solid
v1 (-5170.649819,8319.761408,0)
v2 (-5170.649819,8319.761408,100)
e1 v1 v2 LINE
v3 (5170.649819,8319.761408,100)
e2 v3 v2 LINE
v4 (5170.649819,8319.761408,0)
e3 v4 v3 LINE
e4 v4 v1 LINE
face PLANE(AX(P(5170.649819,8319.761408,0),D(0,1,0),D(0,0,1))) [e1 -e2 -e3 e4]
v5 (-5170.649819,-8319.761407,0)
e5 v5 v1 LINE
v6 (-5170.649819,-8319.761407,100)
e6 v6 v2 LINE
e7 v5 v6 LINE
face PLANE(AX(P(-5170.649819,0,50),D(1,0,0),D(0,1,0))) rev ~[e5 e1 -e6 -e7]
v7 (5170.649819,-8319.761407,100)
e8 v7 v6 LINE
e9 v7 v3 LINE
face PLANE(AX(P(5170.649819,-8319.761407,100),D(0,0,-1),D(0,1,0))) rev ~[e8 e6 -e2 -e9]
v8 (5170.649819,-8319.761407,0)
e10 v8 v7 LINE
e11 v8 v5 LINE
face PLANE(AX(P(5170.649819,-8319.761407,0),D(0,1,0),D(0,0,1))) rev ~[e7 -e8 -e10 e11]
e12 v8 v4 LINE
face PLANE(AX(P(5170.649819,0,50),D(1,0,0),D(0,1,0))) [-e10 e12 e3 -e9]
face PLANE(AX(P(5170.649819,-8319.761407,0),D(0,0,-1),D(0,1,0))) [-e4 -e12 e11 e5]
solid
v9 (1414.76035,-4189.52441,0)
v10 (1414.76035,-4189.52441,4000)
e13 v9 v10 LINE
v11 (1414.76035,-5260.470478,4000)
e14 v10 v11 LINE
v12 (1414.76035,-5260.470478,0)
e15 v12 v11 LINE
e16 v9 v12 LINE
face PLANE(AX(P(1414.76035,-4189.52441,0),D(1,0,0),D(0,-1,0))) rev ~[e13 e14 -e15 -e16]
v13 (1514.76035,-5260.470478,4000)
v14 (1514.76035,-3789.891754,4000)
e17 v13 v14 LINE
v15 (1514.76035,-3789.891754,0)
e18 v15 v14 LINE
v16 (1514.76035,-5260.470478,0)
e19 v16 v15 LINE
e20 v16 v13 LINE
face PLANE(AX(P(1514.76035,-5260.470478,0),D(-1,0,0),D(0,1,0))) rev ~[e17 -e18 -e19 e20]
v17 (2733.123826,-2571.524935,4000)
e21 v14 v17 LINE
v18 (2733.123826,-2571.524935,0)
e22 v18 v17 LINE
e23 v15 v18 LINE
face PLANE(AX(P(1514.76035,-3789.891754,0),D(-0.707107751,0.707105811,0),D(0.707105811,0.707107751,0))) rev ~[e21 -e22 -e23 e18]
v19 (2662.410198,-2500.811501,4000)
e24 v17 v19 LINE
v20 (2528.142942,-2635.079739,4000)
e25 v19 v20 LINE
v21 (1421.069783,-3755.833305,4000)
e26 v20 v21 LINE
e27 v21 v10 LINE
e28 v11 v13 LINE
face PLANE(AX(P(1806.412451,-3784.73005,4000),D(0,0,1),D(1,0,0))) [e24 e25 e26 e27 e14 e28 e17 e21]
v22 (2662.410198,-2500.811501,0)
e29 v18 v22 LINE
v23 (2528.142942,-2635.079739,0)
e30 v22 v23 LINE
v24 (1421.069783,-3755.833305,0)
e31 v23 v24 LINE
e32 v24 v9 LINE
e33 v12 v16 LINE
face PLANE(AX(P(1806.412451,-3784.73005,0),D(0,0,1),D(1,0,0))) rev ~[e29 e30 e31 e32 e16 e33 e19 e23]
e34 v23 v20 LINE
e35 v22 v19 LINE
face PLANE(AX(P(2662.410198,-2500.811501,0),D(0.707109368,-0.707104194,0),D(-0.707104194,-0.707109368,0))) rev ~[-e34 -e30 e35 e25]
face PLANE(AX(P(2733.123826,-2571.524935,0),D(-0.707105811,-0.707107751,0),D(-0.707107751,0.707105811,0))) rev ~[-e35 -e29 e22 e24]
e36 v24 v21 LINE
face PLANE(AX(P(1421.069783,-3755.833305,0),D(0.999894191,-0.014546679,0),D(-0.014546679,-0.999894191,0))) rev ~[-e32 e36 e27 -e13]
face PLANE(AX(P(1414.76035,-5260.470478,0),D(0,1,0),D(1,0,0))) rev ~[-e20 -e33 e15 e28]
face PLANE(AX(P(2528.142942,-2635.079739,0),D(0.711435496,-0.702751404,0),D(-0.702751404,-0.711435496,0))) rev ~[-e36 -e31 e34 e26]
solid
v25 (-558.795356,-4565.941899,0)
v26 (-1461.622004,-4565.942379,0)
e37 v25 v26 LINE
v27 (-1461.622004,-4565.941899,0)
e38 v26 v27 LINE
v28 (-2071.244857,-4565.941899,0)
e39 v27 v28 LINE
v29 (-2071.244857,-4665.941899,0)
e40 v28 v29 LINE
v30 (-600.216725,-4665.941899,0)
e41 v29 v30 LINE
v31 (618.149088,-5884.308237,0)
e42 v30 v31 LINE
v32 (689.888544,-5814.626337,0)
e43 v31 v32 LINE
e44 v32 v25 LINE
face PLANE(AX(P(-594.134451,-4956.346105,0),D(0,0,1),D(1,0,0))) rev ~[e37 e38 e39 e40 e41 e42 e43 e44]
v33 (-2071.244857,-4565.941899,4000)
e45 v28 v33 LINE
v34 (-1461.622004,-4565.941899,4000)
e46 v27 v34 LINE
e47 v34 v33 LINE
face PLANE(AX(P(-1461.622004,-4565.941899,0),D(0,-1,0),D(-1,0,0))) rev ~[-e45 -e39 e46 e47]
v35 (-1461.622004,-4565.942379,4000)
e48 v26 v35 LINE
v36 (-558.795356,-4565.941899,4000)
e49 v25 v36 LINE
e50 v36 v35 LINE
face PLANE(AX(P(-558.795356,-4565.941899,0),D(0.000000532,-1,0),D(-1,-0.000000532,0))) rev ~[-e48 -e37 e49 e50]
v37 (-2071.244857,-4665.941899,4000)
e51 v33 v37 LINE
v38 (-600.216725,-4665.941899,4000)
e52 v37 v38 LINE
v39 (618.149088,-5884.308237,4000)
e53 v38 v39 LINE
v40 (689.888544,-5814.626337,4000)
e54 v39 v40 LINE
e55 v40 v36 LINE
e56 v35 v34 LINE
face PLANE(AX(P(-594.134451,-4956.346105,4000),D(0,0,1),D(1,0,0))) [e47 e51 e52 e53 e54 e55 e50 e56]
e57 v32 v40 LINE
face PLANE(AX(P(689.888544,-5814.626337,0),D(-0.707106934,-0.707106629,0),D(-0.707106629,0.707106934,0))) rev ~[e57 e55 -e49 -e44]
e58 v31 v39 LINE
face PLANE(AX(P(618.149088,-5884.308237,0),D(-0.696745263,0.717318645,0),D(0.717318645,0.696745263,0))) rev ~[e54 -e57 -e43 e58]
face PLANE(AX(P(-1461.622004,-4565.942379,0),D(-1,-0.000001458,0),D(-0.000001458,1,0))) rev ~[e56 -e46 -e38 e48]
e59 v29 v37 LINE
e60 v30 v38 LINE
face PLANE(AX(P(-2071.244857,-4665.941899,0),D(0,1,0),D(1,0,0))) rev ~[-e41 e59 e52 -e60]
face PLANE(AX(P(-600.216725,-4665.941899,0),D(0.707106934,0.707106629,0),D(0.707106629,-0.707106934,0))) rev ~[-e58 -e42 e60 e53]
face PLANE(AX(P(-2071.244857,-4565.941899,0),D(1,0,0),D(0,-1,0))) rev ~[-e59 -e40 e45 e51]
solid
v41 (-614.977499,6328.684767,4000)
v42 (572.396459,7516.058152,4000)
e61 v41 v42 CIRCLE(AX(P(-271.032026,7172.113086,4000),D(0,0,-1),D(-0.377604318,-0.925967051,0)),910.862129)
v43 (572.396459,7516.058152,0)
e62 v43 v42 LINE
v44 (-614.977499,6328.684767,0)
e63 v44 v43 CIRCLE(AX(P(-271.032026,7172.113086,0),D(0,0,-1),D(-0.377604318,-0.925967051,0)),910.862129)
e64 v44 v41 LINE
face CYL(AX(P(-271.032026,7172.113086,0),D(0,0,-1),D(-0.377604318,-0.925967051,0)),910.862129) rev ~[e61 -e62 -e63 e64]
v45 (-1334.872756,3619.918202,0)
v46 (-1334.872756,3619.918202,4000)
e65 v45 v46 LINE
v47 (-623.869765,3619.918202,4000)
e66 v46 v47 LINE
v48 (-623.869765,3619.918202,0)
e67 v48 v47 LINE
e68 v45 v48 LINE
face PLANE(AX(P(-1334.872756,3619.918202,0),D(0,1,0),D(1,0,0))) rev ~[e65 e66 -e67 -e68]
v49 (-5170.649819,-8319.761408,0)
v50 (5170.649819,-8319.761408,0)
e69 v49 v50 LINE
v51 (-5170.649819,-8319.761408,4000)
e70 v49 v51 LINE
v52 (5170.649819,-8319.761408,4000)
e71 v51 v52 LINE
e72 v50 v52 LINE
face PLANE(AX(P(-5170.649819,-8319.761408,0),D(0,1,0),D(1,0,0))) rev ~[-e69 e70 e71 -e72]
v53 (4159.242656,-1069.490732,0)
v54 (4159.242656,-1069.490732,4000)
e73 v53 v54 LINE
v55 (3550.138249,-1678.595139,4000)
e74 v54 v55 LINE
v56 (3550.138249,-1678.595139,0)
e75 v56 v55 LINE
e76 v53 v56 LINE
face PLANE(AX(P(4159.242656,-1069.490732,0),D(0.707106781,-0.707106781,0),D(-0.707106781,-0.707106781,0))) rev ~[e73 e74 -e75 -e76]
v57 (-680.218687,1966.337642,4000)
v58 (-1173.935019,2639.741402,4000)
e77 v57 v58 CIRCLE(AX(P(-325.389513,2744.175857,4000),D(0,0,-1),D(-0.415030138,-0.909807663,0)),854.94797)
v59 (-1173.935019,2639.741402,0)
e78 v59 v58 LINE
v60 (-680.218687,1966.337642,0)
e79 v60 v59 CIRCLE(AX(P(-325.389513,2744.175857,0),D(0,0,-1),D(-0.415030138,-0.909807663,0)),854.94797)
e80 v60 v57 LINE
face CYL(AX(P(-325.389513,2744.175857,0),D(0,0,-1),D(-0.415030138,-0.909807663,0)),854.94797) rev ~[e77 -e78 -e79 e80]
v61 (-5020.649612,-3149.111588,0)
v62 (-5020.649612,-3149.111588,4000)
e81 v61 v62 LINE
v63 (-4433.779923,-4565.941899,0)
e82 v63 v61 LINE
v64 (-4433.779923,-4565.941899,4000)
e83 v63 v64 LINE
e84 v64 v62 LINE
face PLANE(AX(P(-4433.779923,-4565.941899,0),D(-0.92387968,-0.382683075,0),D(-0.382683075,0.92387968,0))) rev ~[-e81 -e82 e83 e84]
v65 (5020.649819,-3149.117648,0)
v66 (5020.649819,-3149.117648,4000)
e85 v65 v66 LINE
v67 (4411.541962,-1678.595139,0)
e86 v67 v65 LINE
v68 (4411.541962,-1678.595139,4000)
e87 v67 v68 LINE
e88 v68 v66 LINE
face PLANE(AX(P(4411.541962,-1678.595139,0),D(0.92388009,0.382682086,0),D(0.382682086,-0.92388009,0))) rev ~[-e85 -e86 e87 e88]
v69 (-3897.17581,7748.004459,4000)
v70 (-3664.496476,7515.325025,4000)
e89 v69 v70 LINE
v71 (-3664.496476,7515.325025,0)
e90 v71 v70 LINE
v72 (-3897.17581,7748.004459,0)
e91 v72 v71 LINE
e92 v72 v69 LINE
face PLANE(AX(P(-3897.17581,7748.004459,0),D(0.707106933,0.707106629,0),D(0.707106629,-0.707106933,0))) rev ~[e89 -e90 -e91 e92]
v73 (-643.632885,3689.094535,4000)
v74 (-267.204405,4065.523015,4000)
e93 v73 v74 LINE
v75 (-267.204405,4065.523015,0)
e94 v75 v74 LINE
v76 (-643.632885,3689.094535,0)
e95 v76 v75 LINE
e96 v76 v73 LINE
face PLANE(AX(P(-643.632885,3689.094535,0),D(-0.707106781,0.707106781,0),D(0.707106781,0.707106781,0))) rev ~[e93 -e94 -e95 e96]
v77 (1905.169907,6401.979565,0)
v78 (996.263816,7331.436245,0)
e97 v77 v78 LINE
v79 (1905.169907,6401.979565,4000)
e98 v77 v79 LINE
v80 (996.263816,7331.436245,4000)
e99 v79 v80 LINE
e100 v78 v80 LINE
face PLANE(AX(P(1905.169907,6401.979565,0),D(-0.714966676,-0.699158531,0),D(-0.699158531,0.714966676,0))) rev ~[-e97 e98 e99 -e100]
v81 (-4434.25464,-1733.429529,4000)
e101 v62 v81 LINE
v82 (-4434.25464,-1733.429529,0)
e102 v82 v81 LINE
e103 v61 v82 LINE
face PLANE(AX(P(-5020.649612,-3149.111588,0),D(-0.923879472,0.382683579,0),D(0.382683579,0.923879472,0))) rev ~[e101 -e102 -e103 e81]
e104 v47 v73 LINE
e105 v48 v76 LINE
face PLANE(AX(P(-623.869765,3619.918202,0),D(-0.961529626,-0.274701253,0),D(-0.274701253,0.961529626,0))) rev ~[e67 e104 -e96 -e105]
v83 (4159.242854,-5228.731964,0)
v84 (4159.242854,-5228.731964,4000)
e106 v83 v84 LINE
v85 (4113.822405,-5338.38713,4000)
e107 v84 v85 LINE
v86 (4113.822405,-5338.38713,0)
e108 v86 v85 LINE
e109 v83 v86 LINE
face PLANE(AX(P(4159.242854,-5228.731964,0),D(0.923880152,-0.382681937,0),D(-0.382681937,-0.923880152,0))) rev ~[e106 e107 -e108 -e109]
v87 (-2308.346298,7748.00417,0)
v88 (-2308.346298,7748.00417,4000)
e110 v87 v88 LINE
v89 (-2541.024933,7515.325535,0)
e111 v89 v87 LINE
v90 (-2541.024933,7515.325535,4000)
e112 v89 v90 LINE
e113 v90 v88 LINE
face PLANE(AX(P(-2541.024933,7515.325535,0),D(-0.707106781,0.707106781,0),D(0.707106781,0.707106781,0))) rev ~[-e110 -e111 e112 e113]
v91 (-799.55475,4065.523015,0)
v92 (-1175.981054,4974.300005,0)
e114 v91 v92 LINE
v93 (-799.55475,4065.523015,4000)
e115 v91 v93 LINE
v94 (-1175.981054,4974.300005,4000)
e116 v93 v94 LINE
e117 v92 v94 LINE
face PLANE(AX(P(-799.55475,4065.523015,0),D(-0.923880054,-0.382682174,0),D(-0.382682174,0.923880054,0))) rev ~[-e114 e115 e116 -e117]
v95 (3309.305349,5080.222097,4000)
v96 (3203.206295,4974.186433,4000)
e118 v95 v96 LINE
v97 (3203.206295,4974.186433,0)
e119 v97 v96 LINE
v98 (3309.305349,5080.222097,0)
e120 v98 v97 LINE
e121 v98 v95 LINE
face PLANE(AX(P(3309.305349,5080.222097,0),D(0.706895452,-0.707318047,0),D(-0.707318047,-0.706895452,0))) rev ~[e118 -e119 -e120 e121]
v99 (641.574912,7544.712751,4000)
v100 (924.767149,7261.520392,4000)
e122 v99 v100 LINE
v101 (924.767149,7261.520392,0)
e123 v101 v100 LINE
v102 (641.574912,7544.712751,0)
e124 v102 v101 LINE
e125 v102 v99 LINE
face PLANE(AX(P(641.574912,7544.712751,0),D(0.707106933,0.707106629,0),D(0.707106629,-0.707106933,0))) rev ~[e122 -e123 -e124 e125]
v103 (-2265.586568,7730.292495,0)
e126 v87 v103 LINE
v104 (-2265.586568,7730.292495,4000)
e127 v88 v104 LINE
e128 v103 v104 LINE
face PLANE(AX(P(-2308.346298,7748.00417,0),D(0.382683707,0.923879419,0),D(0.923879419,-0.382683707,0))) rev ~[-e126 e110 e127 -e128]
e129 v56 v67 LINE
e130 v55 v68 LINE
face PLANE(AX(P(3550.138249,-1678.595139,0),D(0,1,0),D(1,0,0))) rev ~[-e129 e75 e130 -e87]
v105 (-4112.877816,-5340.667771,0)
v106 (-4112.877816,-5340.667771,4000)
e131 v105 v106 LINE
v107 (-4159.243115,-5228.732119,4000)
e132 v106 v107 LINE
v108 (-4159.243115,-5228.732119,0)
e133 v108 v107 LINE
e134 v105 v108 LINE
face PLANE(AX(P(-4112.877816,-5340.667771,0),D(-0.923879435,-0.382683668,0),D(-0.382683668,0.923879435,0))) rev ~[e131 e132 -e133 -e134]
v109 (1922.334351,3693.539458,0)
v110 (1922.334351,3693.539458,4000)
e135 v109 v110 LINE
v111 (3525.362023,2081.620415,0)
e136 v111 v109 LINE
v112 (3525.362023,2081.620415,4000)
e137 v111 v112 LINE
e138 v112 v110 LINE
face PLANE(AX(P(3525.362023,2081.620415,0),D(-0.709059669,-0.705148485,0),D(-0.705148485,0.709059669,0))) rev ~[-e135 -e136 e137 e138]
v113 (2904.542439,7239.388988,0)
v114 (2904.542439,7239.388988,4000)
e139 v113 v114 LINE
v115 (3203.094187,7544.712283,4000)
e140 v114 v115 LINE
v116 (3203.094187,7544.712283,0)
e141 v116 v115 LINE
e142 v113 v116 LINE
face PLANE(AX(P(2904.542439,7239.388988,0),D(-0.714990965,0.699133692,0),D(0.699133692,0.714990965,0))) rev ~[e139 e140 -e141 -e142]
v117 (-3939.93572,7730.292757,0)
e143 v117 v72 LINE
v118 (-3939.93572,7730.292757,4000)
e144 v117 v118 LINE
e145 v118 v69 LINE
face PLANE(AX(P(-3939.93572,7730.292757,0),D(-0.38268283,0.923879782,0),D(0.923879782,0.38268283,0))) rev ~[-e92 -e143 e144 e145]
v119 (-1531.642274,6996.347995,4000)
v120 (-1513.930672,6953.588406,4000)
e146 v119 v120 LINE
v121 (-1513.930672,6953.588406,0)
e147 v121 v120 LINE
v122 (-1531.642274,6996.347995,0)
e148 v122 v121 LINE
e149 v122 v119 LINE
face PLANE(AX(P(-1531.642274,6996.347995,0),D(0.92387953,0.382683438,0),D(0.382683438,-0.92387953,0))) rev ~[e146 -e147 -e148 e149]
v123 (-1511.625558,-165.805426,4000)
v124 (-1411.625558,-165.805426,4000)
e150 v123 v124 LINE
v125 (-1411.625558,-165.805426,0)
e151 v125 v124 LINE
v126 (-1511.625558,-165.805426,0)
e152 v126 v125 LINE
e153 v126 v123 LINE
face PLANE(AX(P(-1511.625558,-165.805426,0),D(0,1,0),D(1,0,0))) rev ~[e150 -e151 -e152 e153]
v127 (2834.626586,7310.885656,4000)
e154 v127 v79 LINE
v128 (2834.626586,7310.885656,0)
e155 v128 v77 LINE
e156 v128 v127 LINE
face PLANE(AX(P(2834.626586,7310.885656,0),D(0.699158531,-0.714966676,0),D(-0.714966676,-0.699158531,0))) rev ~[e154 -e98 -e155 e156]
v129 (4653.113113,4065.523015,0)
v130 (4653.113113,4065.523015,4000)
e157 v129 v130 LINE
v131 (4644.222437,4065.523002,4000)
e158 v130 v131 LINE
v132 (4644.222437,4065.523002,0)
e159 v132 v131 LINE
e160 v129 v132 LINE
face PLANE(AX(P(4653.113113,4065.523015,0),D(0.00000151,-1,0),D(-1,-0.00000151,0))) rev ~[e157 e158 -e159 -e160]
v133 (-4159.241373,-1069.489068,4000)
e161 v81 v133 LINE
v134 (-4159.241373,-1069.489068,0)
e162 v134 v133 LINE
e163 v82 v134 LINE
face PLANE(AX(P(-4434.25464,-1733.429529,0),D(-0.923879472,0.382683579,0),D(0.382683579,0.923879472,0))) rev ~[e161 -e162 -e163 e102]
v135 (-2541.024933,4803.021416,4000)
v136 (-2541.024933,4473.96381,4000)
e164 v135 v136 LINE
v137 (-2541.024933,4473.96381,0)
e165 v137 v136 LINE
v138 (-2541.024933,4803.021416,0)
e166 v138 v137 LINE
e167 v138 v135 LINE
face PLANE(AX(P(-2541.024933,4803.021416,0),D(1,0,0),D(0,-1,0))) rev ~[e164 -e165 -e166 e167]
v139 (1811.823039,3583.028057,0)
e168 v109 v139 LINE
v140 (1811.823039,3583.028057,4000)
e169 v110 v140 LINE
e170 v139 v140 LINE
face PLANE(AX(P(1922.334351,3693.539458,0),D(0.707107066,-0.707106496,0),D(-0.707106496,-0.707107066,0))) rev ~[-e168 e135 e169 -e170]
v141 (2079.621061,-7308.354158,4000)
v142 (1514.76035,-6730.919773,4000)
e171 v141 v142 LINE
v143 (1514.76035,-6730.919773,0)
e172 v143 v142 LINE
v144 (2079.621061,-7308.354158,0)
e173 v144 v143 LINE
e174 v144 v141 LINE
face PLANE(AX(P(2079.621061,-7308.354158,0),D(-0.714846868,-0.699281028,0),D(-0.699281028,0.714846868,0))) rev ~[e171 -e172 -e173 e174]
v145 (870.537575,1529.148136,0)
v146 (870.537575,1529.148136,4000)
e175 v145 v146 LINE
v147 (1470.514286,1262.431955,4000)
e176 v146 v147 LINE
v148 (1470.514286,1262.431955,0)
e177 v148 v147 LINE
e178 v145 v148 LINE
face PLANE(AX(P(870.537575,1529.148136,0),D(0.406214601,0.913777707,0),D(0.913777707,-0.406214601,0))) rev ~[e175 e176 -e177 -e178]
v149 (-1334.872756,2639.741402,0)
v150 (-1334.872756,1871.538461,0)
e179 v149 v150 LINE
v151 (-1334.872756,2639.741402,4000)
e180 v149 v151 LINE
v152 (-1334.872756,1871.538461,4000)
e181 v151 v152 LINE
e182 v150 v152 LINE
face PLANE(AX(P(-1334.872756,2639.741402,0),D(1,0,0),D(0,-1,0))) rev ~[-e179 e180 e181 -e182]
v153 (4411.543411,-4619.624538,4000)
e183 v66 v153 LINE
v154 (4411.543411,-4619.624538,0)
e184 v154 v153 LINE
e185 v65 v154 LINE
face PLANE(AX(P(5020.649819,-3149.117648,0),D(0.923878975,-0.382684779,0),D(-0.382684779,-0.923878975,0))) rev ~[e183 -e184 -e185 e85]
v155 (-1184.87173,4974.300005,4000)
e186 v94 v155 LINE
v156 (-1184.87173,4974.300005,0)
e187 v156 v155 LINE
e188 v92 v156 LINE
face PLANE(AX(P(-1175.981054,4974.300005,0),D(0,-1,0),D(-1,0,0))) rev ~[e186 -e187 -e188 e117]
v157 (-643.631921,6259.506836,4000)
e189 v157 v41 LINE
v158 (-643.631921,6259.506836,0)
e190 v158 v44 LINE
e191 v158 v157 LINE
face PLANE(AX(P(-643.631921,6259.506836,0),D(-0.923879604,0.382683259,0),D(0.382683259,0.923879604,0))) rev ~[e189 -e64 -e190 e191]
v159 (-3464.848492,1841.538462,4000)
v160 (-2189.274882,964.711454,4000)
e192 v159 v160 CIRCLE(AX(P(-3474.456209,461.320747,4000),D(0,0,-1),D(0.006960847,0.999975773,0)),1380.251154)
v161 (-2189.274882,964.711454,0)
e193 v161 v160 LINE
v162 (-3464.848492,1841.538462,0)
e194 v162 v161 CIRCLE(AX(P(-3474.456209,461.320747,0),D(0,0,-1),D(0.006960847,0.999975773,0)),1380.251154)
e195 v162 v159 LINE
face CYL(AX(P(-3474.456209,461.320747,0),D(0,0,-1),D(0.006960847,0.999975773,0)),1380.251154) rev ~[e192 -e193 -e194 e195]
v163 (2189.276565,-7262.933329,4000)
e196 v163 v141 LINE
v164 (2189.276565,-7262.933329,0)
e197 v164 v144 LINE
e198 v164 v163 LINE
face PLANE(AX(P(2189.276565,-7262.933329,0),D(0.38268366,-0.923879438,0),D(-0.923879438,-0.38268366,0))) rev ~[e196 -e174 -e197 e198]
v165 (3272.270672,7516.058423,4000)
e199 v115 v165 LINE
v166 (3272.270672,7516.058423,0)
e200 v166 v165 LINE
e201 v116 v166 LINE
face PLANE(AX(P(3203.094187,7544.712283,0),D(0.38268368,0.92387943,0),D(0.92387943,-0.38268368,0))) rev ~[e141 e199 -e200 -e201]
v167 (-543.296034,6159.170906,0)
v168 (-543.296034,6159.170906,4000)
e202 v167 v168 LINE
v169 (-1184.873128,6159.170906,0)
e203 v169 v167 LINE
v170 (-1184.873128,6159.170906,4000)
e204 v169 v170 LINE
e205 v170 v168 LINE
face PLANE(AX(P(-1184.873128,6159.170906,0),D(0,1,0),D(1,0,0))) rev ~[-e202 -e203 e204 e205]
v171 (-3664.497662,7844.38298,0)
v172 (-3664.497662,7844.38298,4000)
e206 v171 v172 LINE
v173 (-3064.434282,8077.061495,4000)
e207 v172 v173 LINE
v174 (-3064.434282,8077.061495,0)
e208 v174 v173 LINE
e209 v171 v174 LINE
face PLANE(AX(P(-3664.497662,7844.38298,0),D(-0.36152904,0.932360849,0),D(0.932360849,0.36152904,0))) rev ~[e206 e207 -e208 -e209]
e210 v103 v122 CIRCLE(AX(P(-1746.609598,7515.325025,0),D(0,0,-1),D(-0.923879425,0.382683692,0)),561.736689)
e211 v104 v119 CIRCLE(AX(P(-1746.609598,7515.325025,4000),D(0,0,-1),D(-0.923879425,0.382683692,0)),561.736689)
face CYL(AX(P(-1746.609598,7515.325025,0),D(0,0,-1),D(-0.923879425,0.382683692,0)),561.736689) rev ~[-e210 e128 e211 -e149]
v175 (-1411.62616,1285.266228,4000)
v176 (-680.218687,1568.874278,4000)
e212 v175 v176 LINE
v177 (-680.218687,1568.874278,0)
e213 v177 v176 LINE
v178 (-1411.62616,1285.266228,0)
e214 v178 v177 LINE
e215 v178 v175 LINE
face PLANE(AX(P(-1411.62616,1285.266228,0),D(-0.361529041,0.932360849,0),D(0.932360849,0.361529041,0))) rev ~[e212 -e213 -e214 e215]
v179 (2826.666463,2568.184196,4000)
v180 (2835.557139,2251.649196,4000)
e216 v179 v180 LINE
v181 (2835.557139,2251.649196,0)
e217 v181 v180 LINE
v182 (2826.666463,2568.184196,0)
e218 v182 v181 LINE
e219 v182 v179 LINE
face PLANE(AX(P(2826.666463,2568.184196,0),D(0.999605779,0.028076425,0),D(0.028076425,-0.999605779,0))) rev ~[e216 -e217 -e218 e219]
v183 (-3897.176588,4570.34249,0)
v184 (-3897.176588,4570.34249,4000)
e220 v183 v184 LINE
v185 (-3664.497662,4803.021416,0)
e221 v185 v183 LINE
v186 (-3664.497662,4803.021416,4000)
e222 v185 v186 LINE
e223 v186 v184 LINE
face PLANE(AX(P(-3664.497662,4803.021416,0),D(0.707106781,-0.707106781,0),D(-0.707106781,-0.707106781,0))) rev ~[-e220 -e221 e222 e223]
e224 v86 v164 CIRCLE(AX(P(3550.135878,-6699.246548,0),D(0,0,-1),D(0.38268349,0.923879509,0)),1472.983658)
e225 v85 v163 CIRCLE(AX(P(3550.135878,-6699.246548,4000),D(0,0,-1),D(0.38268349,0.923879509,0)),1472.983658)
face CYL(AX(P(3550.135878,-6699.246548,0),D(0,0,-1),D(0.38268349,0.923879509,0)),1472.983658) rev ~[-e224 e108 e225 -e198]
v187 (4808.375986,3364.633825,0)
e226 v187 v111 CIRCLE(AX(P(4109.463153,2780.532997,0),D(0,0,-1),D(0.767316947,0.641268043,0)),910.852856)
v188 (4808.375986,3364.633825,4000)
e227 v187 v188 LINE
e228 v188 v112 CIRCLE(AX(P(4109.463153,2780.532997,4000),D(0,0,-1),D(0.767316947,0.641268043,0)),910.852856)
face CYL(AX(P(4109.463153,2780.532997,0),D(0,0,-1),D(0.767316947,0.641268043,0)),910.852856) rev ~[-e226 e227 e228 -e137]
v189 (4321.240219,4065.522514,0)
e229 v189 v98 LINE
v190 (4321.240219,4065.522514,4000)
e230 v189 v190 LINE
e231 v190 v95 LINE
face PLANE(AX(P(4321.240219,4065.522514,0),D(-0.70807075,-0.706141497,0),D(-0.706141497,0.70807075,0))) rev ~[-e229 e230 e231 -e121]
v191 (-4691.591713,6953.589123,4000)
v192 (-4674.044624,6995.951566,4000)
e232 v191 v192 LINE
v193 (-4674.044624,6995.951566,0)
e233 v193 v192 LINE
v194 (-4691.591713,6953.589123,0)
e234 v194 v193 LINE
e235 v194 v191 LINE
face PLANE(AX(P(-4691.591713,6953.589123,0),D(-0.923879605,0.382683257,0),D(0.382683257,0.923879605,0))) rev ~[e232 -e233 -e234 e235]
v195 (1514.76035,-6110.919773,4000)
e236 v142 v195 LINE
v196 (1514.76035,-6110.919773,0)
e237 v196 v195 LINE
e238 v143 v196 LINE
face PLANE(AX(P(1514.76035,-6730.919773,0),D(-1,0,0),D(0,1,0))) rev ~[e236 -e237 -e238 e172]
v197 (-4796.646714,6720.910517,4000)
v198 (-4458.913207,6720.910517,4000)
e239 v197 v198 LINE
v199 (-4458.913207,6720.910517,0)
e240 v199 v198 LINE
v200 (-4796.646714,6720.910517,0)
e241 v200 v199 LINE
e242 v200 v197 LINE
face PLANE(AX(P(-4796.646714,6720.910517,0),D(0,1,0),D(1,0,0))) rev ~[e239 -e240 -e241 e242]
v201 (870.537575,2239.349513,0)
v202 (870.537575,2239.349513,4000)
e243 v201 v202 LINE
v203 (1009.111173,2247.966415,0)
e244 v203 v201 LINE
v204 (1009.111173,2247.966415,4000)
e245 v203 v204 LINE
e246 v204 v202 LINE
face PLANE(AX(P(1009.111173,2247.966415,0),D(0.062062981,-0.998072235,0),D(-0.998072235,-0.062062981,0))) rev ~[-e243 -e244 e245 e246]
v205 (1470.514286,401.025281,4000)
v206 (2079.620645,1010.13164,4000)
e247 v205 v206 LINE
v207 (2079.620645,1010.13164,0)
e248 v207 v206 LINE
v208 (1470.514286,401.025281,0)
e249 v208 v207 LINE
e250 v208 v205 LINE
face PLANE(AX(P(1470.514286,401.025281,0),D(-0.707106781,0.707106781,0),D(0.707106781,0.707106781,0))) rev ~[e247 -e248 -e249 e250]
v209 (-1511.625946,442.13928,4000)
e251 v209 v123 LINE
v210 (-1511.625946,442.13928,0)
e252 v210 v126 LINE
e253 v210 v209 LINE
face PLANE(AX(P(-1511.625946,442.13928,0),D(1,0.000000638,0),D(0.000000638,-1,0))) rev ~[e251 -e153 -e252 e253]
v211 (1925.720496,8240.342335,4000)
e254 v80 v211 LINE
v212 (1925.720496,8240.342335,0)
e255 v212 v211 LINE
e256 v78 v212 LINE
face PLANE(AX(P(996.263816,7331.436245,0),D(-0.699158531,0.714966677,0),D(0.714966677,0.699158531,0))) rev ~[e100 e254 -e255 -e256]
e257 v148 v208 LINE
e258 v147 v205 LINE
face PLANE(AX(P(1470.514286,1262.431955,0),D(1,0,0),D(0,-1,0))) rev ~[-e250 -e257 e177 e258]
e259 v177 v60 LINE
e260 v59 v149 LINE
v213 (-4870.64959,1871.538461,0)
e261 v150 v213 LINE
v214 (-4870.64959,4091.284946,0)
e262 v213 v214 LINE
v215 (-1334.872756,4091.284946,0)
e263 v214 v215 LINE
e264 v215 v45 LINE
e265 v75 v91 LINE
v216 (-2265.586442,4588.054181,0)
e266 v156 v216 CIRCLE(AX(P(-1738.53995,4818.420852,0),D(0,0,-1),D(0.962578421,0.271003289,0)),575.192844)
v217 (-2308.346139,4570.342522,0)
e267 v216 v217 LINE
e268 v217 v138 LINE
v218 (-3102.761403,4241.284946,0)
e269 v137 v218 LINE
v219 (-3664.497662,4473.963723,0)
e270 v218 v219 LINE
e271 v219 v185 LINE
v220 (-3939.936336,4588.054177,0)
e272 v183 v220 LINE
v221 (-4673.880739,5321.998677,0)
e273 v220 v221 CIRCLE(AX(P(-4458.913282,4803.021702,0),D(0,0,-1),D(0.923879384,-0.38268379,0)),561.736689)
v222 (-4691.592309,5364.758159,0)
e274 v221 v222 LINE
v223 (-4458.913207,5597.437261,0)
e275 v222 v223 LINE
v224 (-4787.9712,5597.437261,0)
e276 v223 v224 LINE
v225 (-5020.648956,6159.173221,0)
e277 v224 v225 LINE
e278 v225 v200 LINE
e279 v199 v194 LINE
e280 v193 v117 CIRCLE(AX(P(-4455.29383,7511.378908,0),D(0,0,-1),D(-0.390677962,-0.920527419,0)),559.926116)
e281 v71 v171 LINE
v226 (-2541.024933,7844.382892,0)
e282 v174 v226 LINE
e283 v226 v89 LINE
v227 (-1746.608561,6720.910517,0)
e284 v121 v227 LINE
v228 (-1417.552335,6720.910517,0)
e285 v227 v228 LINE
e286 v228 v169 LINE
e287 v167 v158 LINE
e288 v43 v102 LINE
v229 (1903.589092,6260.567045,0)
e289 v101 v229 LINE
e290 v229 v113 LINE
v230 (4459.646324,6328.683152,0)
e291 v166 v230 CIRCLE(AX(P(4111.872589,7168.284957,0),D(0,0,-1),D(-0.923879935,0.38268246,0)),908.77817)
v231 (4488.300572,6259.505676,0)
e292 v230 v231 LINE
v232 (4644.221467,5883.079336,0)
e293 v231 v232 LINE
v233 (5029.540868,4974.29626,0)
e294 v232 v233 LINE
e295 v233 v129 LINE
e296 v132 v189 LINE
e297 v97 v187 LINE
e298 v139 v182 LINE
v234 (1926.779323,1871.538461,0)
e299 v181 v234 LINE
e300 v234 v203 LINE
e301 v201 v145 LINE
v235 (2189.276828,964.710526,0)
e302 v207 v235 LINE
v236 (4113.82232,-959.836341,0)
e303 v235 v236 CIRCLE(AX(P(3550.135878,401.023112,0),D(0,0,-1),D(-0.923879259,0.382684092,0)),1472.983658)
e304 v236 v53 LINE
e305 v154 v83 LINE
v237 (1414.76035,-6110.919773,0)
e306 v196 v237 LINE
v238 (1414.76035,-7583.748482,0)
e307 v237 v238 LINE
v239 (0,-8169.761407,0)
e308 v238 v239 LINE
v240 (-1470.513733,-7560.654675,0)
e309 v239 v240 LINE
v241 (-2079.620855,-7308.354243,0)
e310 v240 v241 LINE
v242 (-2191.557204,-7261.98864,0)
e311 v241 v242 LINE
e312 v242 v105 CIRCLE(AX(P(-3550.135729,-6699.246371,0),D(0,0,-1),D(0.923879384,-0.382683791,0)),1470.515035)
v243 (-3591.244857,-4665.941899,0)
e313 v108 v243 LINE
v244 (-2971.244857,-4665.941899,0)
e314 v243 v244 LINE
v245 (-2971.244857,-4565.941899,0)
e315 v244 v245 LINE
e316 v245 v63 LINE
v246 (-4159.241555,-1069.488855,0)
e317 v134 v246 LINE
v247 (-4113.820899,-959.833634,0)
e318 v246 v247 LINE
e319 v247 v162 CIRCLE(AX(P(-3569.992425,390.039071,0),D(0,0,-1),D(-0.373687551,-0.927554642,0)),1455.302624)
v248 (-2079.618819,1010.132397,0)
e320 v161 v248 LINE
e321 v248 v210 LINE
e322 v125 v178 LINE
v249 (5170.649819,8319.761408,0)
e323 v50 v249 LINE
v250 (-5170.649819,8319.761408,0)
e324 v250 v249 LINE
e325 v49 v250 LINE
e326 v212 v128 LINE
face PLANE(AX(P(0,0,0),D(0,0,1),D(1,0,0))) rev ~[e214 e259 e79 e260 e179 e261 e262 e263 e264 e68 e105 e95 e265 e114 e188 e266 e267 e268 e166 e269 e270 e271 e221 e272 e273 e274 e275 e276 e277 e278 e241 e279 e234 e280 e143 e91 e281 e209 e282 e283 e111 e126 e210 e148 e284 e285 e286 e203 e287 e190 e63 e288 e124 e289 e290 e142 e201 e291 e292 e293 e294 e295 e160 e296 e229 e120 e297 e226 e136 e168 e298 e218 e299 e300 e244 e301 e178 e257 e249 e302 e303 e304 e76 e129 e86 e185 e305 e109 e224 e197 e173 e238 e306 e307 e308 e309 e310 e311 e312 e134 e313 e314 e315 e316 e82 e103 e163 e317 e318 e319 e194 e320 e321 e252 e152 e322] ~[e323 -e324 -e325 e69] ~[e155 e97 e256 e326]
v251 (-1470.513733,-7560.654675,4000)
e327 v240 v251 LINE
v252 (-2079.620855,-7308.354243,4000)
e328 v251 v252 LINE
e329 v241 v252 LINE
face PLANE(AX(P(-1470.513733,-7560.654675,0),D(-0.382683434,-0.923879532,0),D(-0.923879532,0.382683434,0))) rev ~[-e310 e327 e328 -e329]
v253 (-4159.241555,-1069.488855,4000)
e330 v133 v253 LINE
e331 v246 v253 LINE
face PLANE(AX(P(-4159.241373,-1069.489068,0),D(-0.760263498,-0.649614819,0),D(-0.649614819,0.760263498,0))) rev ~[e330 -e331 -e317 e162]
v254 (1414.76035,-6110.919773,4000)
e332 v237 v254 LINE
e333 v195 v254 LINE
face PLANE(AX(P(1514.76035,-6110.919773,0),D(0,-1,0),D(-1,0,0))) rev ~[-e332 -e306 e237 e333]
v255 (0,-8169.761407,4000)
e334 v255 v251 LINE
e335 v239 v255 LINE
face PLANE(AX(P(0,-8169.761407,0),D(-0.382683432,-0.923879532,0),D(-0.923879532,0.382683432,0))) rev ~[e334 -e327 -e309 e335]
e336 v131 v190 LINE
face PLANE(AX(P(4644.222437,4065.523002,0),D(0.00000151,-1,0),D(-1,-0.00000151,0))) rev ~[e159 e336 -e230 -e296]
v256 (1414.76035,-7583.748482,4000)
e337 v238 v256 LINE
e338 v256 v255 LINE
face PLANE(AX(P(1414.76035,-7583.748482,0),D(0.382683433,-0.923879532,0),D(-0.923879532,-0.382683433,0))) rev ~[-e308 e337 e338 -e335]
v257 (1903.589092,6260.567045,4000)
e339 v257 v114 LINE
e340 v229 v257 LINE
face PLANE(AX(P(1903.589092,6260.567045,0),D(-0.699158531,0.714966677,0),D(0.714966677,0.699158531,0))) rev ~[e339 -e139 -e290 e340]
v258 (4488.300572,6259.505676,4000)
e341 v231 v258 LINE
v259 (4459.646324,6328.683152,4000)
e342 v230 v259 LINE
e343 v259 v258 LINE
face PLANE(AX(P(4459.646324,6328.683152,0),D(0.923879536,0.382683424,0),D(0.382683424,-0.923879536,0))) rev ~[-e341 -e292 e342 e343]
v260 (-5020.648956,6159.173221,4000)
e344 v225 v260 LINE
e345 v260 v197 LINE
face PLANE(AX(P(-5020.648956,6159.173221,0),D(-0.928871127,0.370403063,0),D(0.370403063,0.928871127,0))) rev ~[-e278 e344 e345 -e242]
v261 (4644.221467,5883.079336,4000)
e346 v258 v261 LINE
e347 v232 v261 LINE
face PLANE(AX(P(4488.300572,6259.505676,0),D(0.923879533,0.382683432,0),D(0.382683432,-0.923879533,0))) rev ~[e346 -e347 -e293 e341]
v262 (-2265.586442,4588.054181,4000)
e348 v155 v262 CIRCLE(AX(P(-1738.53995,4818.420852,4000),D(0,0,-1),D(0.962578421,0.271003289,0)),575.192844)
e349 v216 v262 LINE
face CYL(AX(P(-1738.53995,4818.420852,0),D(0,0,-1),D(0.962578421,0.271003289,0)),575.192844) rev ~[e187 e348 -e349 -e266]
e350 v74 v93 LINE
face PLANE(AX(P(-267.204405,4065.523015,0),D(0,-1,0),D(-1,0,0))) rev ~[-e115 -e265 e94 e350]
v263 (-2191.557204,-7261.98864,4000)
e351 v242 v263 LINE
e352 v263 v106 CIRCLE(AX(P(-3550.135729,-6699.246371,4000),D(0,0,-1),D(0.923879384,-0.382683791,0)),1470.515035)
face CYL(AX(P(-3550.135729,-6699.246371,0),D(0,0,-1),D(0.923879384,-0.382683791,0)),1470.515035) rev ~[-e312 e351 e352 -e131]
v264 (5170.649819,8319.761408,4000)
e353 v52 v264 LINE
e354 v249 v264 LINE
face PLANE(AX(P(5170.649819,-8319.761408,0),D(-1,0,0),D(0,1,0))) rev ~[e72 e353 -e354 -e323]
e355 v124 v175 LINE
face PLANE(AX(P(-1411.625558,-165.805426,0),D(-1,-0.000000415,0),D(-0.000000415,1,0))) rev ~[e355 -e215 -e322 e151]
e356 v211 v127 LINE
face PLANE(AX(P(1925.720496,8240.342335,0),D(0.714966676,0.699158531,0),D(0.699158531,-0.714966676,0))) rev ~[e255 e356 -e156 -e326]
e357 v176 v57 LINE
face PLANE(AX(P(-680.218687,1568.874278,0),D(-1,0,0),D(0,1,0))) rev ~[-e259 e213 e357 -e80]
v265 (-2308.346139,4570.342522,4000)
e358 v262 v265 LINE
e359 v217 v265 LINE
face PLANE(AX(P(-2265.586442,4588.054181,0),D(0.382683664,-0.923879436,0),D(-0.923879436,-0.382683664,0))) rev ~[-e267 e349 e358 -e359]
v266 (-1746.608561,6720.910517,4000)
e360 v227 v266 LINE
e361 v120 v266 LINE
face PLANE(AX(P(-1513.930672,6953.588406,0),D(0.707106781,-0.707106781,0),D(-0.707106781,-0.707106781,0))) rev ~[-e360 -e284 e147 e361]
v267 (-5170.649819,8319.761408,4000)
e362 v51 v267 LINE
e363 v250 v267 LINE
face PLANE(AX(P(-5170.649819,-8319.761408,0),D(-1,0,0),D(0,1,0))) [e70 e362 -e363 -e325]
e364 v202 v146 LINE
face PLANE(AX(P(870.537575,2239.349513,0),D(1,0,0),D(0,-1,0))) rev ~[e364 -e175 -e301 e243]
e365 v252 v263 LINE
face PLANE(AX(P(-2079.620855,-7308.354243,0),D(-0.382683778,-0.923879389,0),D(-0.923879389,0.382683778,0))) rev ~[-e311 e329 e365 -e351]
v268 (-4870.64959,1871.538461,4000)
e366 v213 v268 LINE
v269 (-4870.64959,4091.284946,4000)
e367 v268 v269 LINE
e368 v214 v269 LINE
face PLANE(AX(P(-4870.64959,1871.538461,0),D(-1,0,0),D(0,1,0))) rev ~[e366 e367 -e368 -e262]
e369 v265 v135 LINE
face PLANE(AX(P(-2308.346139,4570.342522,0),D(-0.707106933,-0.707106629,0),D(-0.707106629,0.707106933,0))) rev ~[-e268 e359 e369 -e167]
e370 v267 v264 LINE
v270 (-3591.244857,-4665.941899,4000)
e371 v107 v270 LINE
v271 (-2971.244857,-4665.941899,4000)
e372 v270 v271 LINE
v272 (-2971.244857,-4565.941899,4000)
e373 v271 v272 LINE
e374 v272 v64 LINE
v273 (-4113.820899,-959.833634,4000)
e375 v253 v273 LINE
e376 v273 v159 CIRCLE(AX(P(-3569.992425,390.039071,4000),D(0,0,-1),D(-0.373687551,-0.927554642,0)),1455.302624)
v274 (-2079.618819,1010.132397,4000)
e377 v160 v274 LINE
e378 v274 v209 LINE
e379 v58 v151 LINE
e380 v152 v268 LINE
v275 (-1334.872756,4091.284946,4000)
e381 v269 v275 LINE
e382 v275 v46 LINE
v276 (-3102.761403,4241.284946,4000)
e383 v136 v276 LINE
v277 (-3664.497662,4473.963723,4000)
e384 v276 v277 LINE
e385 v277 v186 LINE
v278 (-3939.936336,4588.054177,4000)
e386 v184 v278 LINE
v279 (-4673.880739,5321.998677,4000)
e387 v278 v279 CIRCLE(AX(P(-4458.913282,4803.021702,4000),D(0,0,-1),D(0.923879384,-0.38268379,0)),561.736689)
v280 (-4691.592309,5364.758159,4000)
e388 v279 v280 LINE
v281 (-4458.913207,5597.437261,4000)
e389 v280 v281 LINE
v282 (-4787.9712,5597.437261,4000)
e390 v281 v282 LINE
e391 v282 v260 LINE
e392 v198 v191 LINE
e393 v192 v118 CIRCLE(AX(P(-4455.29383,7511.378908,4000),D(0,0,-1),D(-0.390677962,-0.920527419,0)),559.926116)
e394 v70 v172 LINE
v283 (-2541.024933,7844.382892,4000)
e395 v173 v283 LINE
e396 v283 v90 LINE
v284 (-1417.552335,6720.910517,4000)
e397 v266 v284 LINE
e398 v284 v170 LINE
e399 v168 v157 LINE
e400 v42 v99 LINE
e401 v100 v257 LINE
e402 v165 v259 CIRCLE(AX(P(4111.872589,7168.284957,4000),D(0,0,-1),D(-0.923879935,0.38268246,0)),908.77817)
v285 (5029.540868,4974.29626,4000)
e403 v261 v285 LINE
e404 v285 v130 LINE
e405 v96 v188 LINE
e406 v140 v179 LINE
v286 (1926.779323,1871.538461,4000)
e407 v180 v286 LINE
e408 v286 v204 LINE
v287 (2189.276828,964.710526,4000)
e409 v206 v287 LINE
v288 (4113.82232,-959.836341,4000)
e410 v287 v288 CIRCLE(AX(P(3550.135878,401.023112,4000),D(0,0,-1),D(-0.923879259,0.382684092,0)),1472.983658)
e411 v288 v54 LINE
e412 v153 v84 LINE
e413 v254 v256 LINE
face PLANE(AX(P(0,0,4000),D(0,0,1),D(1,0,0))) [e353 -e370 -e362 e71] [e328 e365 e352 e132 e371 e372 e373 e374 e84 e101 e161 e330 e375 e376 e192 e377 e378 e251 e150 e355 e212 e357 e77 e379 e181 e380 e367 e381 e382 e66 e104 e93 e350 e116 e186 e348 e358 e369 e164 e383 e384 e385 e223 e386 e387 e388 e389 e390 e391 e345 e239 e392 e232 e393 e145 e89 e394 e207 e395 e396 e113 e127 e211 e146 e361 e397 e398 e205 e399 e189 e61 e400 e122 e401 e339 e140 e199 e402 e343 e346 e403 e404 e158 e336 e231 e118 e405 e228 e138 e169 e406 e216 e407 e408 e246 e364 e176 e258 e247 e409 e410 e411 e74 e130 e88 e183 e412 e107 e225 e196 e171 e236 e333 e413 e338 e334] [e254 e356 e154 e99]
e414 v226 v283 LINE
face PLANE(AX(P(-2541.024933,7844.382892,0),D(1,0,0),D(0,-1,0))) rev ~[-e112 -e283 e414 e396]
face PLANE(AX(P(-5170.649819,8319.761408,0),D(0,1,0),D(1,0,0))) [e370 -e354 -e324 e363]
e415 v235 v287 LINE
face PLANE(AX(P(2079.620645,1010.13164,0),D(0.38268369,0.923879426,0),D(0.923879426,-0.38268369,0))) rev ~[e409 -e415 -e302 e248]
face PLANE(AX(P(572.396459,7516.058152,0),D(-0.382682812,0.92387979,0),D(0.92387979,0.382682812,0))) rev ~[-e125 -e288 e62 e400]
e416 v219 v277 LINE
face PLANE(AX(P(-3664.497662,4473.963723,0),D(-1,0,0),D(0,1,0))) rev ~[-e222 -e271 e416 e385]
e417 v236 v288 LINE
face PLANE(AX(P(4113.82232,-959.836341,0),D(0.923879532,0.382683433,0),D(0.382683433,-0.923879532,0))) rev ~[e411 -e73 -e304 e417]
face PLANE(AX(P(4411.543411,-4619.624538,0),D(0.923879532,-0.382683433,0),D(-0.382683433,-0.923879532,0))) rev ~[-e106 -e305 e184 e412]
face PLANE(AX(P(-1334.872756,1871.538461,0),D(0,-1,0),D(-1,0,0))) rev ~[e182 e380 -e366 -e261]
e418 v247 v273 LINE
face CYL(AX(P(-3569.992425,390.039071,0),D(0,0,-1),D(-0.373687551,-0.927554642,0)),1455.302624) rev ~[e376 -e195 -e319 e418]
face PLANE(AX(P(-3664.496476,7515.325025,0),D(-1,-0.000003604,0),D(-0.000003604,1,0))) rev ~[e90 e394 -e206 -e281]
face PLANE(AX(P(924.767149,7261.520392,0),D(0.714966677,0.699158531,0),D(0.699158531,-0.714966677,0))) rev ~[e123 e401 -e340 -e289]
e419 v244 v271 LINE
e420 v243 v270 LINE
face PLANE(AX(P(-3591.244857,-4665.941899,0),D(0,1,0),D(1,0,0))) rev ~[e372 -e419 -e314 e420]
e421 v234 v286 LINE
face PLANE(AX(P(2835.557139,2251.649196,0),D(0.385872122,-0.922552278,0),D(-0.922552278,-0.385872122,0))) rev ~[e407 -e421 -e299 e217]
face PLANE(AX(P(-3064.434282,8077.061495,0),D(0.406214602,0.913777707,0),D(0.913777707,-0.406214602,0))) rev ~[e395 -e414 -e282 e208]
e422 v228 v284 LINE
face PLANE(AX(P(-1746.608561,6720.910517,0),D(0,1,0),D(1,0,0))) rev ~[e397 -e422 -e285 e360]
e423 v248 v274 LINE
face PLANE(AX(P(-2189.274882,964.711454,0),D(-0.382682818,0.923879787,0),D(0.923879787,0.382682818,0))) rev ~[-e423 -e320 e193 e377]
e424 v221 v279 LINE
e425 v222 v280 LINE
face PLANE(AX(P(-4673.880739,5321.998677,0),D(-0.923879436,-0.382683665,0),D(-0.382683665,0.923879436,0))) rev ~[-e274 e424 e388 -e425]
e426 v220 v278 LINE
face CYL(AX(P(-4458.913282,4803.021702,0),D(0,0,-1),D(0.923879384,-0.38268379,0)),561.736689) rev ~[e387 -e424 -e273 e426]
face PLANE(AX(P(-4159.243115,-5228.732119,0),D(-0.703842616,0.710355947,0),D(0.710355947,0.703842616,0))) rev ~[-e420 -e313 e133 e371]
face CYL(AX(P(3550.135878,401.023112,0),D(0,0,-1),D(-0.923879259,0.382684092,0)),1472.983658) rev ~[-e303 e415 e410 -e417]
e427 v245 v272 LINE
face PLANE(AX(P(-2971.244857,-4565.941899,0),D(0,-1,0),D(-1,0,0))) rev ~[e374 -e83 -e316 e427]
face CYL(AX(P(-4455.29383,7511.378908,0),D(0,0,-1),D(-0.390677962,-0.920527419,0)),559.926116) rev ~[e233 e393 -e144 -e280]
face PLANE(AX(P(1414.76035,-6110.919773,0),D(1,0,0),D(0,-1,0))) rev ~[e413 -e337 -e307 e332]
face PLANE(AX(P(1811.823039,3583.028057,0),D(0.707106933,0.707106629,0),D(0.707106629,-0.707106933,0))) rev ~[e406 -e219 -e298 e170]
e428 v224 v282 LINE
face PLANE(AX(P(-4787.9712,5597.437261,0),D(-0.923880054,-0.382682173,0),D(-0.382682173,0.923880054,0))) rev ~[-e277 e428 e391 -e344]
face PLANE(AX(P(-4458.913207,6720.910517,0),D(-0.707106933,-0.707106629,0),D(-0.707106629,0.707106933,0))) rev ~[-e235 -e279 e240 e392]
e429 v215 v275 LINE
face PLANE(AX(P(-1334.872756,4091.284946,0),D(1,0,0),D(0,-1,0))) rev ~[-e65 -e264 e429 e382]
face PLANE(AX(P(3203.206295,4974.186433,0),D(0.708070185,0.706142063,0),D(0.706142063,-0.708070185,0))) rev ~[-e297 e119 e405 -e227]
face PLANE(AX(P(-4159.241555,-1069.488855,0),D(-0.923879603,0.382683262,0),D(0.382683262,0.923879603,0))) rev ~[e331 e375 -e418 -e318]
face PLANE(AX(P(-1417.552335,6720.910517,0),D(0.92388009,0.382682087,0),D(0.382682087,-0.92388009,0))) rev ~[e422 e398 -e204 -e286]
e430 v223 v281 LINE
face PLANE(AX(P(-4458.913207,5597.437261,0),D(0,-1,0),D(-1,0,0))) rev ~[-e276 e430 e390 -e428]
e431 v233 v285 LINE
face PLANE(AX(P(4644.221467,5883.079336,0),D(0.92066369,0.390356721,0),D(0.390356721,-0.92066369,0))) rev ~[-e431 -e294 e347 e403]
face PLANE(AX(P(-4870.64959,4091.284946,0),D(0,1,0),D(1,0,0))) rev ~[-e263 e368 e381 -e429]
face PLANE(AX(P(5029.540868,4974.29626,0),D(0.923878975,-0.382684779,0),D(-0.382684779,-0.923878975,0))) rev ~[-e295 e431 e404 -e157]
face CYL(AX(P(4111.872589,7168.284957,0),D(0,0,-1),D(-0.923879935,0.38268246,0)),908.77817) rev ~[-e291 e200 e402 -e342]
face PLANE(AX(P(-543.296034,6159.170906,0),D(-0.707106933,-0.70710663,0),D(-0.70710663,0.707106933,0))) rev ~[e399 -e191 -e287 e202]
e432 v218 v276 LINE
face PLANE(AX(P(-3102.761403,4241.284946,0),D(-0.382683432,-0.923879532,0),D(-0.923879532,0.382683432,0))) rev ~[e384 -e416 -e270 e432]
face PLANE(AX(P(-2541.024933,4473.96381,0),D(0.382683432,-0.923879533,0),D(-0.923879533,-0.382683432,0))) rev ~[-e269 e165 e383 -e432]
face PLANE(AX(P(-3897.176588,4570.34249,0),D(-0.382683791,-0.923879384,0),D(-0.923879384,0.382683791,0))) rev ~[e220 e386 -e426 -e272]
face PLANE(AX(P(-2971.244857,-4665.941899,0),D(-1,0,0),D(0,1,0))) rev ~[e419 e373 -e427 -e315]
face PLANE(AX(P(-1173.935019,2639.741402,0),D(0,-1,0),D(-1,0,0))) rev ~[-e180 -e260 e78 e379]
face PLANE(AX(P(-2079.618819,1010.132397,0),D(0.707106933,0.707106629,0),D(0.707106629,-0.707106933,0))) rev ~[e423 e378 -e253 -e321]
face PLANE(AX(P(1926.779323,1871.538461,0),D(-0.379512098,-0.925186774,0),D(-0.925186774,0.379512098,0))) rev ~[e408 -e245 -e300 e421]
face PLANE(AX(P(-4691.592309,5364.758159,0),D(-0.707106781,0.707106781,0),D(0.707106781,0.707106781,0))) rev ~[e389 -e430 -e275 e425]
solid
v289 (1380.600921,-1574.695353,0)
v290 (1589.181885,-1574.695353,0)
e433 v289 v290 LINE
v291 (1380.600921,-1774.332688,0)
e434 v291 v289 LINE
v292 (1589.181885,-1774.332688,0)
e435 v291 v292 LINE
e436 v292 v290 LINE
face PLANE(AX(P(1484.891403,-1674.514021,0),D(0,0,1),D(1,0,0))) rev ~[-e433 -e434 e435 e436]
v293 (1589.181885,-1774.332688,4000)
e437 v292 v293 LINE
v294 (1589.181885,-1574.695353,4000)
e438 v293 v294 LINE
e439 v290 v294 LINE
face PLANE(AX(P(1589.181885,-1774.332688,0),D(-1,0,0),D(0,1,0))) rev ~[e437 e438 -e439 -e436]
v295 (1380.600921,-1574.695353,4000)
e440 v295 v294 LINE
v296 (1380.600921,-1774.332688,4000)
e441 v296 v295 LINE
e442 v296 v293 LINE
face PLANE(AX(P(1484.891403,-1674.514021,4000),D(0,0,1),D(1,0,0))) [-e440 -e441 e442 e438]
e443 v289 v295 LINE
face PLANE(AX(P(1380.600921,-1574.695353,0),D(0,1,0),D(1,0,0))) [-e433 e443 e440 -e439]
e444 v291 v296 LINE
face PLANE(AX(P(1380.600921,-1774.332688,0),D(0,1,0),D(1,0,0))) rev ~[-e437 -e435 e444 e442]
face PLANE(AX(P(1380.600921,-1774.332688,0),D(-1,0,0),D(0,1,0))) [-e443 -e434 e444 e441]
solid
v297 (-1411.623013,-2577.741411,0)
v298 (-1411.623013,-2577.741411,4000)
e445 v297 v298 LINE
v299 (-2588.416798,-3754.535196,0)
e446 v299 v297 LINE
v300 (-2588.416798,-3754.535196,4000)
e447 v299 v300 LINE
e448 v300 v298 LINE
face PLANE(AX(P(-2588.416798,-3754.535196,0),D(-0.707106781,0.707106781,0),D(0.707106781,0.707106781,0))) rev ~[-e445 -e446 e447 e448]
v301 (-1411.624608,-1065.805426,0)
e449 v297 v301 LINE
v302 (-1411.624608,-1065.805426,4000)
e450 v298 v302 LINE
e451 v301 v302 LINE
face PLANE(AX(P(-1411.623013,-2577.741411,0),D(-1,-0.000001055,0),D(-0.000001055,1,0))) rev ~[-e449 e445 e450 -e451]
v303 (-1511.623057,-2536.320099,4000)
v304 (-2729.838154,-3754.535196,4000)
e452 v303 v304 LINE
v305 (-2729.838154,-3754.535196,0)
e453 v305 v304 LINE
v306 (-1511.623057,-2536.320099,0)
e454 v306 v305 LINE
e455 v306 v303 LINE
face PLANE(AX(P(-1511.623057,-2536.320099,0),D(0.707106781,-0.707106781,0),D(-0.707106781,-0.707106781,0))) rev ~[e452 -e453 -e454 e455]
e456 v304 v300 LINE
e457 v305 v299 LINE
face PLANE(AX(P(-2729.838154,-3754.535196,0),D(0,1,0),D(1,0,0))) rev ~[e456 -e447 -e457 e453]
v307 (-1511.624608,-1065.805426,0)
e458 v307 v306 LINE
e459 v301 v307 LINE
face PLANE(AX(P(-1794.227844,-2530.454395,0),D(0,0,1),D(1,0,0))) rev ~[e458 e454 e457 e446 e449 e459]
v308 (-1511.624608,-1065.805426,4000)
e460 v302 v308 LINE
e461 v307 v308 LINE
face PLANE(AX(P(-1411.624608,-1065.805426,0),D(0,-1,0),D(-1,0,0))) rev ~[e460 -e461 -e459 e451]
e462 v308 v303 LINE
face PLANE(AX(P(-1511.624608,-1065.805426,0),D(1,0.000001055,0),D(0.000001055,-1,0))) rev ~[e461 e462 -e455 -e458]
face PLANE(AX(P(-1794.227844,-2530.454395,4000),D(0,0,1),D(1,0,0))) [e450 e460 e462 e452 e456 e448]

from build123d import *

# Parameters (mm, degrees)
F0_W     = 10341.299638
F0_H     = 16639.522815
F1_DEPTH = 4000
F0_W_2   = 208.580964
F0_H_2   = 199.637335
F2_W     = 16639.522815
F2_H     = 100
F3_DEPTH = 10341.299638


# Not quite as in the source:
# - ends of sketch curves that miss each other by under 0.0002 mm in the source are joined


with BuildPart() as f1:
    # F0 (on Top) → F1 (new body)
    with BuildSketch(Plane.XY):
        with Locations((0, 5e-07)):
            Rectangle(F0_W, F0_H)
        with BuildLine():
            Line((1903.589092, 6260.567045), (2904.542439, 7239.388988))
            Line((2904.542439, 7239.388988), (3203.094187, 7544.712283))
            Line((3203.094187, 7544.712283), (3272.270672, 7516.058423))
            ThreePointArc((3272.270672, 7516.058423), (4754.4756925814, 7810.8882666211), (4459.6463241165, 6328.6831517187))
            Line((4459.6463241165, 6328.6831517187), (4488.300572, 6259.505676))
            Line((4488.300572, 6259.505676), (4644.221467, 5883.079336))
            Line((4644.221467, 5883.079336), (5029.540868, 4974.29626))
            Line((5029.540868, 4974.29626), (4653.113113, 4065.523015))
            Line((4653.113113, 4065.523015), (4644.222437, 4065.5230015785))
            Line((4644.222437, 4065.5230015785), (4321.240219, 4065.522514))
            Line((4321.240219, 4065.522514), (3309.305349, 5080.222097))
            Line((3309.305349, 5080.222097), (3203.206295, 4974.186433))
            Line((3203.206295, 4974.186433), (4808.375986, 3364.633825))
            ThreePointArc((4808.375986, 3364.633825), (4753.5332453491, 2136.4626260677), (3525.3620232337, 2081.6204152797))
            Line((3525.3620232337, 2081.6204152797), (1922.334351, 3693.539458))
            Line((1922.334351, 3693.539458), (1811.823039, 3583.028057))
            Line((1811.823039, 3583.028057), (2826.666463, 2568.184196))
            Line((2826.666463, 2568.184196), (2835.557139, 2251.649196))
            Line((2835.557139, 2251.649196), (1926.779323, 1871.538461))
            Line((1926.779323, 1871.538461), (1009.111173, 2247.966415))
            Line((1009.111173, 2247.966415), (870.537575, 2239.349513))
            Line((870.537575, 2239.349513), (870.537575, 1529.148136))
            Line((870.537575, 1529.148136), (1470.514286, 1262.431955))
            Line((1470.514286, 1262.431955), (1470.514286, 401.025281))
            Line((1470.514286, 401.025281), (2079.620645, 1010.13164))
            Line((2079.620645, 1010.13164), (2189.276828, 964.710526))
            ThreePointArc((2189.276828, 964.710526), (4591.692983169, 1442.5794731284), (4113.8223201326, -959.8363413202))
            Line((4113.8223201326, -959.8363413202), (4159.242656, -1069.490732))
            Line((4159.242656, -1069.490732), (3550.138249, -1678.595139))
            Line((3550.138249, -1678.595139), (4411.541962, -1678.595139))
            Line((4411.541962, -1678.595139), (5020.649819, -3149.117648))
            Line((5020.649819, -3149.117648), (4411.543411, -4619.624538))
            Line((4411.543411, -4619.624538), (4159.242854, -5228.731964))
            Line((4159.242854, -5228.731964), (4113.822405, -5338.38713))
            ThreePointArc((4113.822405, -5338.38713), (4591.6927084572, -7740.8031838403), (2189.2765651834, -7262.9333293382))
            Line((2189.2765651834, -7262.9333293382), (2079.621061, -7308.354158))
            Line((2079.621061, -7308.354158), (1514.76035, -6730.919773))
            Line((1514.76035, -6730.919773), (1514.76035, -6110.919773))
            Line((1514.76035, -6110.919773), (1414.76035, -6110.919773))
            Line((1414.76035, -6110.919773), (1414.76035, -7583.748482))
            Line((1414.76035, -7583.748482), (0, -8169.761407))
            Line((0, -8169.761407), (-1470.513733, -7560.654675))
            Line((-1470.513733, -7560.654675), (-2079.620855, -7308.354243))
            Line((-2079.620855, -7308.354243), (-2191.557204, -7261.98864))
            ThreePointArc((-2191.557204, -7261.98864), (-4589.946951546, -7739.0574546245), (-4112.8778162627, -5340.6677713657))
            Line((-4112.8778162627, -5340.6677713657), (-4159.243115, -5228.732119))
            Line((-4159.243115, -5228.732119), (-3591.244857, -4665.941899))
            Line((-3591.244857, -4665.941899), (-2971.244857, -4665.941899))
            Line((-2971.244857, -4665.941899), (-2971.244857, -4565.941899))
            Line((-2971.244857, -4565.941899), (-4433.779923, -4565.941899))
            Line((-4433.779923, -4565.941899), (-5020.649612, -3149.111588))
            Line((-5020.649612, -3149.111588), (-4434.25464, -1733.429529))
            Line((-4434.25464, -1733.429529), (-4159.241373, -1069.489068))
            Line((-4159.241373, -1069.489068), (-4159.241555, -1069.488855))
            Line((-4159.241555, -1069.488855), (-4113.820899, -959.833634))
            ThreePointArc((-4113.820899, -959.833634), (-4987.7485519057, 718.4797689086), (-3464.8484919602, 1841.5384615497))
            ThreePointArc((-3464.8484919602, 1841.5384615497), (-2692.5827745251, 1598.7596156767), (-2189.2748820581, 964.7114539772))
            Line((-2189.2748820581, 964.7114539772), (-2079.618819, 1010.132397))
            Line((-2079.618819, 1010.132397), (-1511.625946, 442.13928))
            Line((-1511.625946, 442.13928), (-1511.625558, -165.805426))
            Line((-1511.625558, -165.805426), (-1411.625558, -165.805426))
            Line((-1411.625558, -165.805426), (-1411.62616, 1285.266228))
            Line((-1411.62616, 1285.266228), (-680.218687, 1568.874278))
            Line((-680.218687, 1568.874278), (-680.218687, 1871.538461))
            Line((-680.218687, 1871.538461), (-680.218687, 1966.337642))
            ThreePointArc((-680.218687, 1966.337642), (-1014.8790423033, 2238.6659951889), (-1173.9350191528, 2639.7414019812))
            Line((-1173.9350191528, 2639.7414019812), (-1334.872756, 2639.741402))
            Line((-1334.872756, 2639.741402), (-1334.872756, 1871.538461))
            Line((-1334.872756, 1871.538461), (-4870.64959, 1871.538461))
            Line((-4870.64959, 1871.538461), (-4870.64959, 4091.284946))
            Line((-4870.64959, 4091.284946), (-1334.872756, 4091.284946))
            Line((-1334.872756, 4091.284946), (-1334.872756, 3619.918202))
            Line((-1334.872756, 3619.918202), (-1184.872756, 3619.918202))
            Line((-1184.872756, 3619.918202), (-623.869765, 3619.918202))
            Line((-623.869765, 3619.918202), (-643.632885, 3689.094535))
            Line((-643.632885, 3689.094535), (-267.204405, 4065.523015))
            Line((-267.204405, 4065.523015), (-799.55475, 4065.523015))
            Line((-799.55475, 4065.523015), (-1175.981054, 4974.300005))
            Line((-1175.981054, 4974.300005), (-1184.87173, 4974.300005))
            ThreePointArc((-1184.87173, 4974.300005), (-1544.9588604922, 4276.7815166727), (-2265.5864419615, 4588.0541810168))
            Line((-2265.5864419615, 4588.0541810168), (-2308.346139, 4570.342522))
            Line((-2308.346139, 4570.342522), (-2541.024933, 4803.021416))
            Line((-2541.024933, 4803.021416), (-2541.024933, 4473.96381))
            Line((-2541.024933, 4473.96381), (-3102.761403, 4241.284946))
            Line((-3102.761403, 4241.284946), (-3664.497662, 4473.963723))
            Line((-3664.497662, 4473.963723), (-3664.497662, 4803.021416))
            Line((-3664.497662, 4803.021416), (-3897.176588, 4570.34249))
            Line((-3897.176588, 4570.34249), (-3939.936336, 4588.054177))
            ThreePointArc((-3939.936336, 4588.054177), (-4856.1211301684, 4405.8139061021), (-4673.8807388704, 5321.9986766871))
            Line((-4673.8807388704, 5321.9986766871), (-4691.592309, 5364.758159))
            Line((-4691.592309, 5364.758159), (-4458.913207, 5597.437261))
            Line((-4458.913207, 5597.437261), (-4787.9712, 5597.437261))
            Line((-4787.9712, 5597.437261), (-5020.648956, 6159.173221))
            Line((-5020.648956, 6159.173221), (-4796.646714, 6720.910517))
            Line((-4796.646714, 6720.910517), (-4458.913207, 6720.910517))
            Line((-4458.913207, 6720.910517), (-4691.591713, 6953.589123))
            Line((-4691.591713, 6953.589123), (-4674.044624, 6995.951566))
            ThreePointArc((-4674.044624, 6995.951566), (-4851.2840085015, 7907.2438267655), (-3939.9357195462, 7730.2927571927))
            Line((-3939.9357195462, 7730.2927571927), (-3897.17581, 7748.004459))
            Line((-3897.17581, 7748.004459), (-3664.496476, 7515.325025))
            Line((-3664.496476, 7515.325025), (-3664.497662, 7844.38298))
            Line((-3664.497662, 7844.38298), (-3064.434282, 8077.061495))
            Line((-3064.434282, 8077.061495), (-2541.024933, 7844.382892))
            Line((-2541.024933, 7844.382892), (-2541.024933, 7515.325535))
            Line((-2541.024933, 7515.325535), (-2308.346298, 7748.00417))
            Line((-2308.346298, 7748.00417), (-2265.586568, 7730.292495))
            ThreePointArc((-2265.586568, 7730.292495), (-1349.4017201593, 7912.5327912257), (-1531.6422740976, 6996.3479952357))
            Line((-1531.6422740976, 6996.3479952357), (-1513.930672, 6953.588406))
            Line((-1513.930672, 6953.588406), (-1746.608561, 6720.910517))
            Line((-1746.608561, 6720.910517), (-1417.552335, 6720.910517))
            Line((-1417.552335, 6720.910517), (-1184.873128, 6159.170906))
            Line((-1184.873128, 6159.170906), (-543.296034, 6159.170906))
            Line((-543.296034, 6159.170906), (-643.631921, 6259.506836))
            Line((-643.631921, 6259.506836), (-614.977499, 6328.684767))
            ThreePointArc((-614.977499, 6328.684767), (-915.1086587372, 7816.1900295466), (572.3964591582, 7516.0581520645))
            Line((572.3964591582, 7516.0581520645), (641.574912, 7544.712751))
            Line((641.574912, 7544.712751), (924.767149, 7261.520392))
            Line((924.767149, 7261.520392), (1903.589092, 6260.567045))
        make_face(mode=Mode.SUBTRACT)
        Polygon((996.263816, 7331.436245), (1925.720496, 8240.342335), (2834.626586, 7310.885656), (1905.169907, 6401.979565), align=None, mode=Mode.SUBTRACT)
    extrude(amount=F1_DEPTH)


with BuildPart() as f1b:
    # F0 (on Top) → F1, piece 2 (new body)
    with BuildSketch(Plane.XY):
        Polygon((2733.123826, -2571.524935), (2662.410198, -2500.811501), (2528.1429422139, -2635.0797392139), (1421.069783, -3755.833305), (1414.76035, -4189.5244096315), (1414.76035, -5260.470478), (1514.76035, -5260.470478), (1514.76035, -3789.891754), align=None)
    extrude(amount=F1_DEPTH)


with BuildPart() as f1c:
    # F0 (on Top) → F1, piece 3 (new body)
    with BuildSketch(Plane.XY):
        Polygon((-600.216725, -4665.941899), (618.149088, -5884.308237), (689.888544, -5814.626337), (54.6019528578, -5179.3394721422), (-558.795356, -4565.941899), (-1461.622004, -4565.942379), (-1461.6220040007, -4565.941899), (-2071.244857, -4565.941899), (-2071.244857, -4665.941899), align=None)
    extrude(amount=F1_DEPTH)


with BuildPart() as f1d:
    # F0 (on Top) → F1, piece 4 (new body)
    with BuildSketch(Plane.XY):
        Polygon((-2729.838154, -3754.535196), (-2588.416798, -3754.535196), (-2038.326382, -3204.44478), (-2025.019791, -3191.138189), (-1411.623013, -2577.741411), (-1411.6246032683, -1070.29071), (-1411.624608, -1065.805426), (-1511.624608, -1065.805426), (-1511.623057, -2536.320099), (-2110.707123, -3135.404165), align=None)
    extrude(amount=F1_DEPTH)


with BuildPart() as f1e:
    # F0 (on Top) → F1, piece 5 (new body)
    with BuildSketch(Plane.XY):
        with Locations((1484.891403, -1674.5140205)):
            Rectangle(F0_W_2, F0_H_2)
    extrude(amount=F1_DEPTH)


with BuildPart() as f3:
    # F2 (on face) → F3 (new body, through all)
    with BuildSketch(Plane.YZ.offset(5170.649819)):
        with Locations((5e-07, 50)):
            Rectangle(F2_W, F2_H)
    extrude(amount=-F3_DEPTH)


solid = Compound([f1.part, f1b.part, f1c.part, f1d.part, f1e.part, f3.part])
